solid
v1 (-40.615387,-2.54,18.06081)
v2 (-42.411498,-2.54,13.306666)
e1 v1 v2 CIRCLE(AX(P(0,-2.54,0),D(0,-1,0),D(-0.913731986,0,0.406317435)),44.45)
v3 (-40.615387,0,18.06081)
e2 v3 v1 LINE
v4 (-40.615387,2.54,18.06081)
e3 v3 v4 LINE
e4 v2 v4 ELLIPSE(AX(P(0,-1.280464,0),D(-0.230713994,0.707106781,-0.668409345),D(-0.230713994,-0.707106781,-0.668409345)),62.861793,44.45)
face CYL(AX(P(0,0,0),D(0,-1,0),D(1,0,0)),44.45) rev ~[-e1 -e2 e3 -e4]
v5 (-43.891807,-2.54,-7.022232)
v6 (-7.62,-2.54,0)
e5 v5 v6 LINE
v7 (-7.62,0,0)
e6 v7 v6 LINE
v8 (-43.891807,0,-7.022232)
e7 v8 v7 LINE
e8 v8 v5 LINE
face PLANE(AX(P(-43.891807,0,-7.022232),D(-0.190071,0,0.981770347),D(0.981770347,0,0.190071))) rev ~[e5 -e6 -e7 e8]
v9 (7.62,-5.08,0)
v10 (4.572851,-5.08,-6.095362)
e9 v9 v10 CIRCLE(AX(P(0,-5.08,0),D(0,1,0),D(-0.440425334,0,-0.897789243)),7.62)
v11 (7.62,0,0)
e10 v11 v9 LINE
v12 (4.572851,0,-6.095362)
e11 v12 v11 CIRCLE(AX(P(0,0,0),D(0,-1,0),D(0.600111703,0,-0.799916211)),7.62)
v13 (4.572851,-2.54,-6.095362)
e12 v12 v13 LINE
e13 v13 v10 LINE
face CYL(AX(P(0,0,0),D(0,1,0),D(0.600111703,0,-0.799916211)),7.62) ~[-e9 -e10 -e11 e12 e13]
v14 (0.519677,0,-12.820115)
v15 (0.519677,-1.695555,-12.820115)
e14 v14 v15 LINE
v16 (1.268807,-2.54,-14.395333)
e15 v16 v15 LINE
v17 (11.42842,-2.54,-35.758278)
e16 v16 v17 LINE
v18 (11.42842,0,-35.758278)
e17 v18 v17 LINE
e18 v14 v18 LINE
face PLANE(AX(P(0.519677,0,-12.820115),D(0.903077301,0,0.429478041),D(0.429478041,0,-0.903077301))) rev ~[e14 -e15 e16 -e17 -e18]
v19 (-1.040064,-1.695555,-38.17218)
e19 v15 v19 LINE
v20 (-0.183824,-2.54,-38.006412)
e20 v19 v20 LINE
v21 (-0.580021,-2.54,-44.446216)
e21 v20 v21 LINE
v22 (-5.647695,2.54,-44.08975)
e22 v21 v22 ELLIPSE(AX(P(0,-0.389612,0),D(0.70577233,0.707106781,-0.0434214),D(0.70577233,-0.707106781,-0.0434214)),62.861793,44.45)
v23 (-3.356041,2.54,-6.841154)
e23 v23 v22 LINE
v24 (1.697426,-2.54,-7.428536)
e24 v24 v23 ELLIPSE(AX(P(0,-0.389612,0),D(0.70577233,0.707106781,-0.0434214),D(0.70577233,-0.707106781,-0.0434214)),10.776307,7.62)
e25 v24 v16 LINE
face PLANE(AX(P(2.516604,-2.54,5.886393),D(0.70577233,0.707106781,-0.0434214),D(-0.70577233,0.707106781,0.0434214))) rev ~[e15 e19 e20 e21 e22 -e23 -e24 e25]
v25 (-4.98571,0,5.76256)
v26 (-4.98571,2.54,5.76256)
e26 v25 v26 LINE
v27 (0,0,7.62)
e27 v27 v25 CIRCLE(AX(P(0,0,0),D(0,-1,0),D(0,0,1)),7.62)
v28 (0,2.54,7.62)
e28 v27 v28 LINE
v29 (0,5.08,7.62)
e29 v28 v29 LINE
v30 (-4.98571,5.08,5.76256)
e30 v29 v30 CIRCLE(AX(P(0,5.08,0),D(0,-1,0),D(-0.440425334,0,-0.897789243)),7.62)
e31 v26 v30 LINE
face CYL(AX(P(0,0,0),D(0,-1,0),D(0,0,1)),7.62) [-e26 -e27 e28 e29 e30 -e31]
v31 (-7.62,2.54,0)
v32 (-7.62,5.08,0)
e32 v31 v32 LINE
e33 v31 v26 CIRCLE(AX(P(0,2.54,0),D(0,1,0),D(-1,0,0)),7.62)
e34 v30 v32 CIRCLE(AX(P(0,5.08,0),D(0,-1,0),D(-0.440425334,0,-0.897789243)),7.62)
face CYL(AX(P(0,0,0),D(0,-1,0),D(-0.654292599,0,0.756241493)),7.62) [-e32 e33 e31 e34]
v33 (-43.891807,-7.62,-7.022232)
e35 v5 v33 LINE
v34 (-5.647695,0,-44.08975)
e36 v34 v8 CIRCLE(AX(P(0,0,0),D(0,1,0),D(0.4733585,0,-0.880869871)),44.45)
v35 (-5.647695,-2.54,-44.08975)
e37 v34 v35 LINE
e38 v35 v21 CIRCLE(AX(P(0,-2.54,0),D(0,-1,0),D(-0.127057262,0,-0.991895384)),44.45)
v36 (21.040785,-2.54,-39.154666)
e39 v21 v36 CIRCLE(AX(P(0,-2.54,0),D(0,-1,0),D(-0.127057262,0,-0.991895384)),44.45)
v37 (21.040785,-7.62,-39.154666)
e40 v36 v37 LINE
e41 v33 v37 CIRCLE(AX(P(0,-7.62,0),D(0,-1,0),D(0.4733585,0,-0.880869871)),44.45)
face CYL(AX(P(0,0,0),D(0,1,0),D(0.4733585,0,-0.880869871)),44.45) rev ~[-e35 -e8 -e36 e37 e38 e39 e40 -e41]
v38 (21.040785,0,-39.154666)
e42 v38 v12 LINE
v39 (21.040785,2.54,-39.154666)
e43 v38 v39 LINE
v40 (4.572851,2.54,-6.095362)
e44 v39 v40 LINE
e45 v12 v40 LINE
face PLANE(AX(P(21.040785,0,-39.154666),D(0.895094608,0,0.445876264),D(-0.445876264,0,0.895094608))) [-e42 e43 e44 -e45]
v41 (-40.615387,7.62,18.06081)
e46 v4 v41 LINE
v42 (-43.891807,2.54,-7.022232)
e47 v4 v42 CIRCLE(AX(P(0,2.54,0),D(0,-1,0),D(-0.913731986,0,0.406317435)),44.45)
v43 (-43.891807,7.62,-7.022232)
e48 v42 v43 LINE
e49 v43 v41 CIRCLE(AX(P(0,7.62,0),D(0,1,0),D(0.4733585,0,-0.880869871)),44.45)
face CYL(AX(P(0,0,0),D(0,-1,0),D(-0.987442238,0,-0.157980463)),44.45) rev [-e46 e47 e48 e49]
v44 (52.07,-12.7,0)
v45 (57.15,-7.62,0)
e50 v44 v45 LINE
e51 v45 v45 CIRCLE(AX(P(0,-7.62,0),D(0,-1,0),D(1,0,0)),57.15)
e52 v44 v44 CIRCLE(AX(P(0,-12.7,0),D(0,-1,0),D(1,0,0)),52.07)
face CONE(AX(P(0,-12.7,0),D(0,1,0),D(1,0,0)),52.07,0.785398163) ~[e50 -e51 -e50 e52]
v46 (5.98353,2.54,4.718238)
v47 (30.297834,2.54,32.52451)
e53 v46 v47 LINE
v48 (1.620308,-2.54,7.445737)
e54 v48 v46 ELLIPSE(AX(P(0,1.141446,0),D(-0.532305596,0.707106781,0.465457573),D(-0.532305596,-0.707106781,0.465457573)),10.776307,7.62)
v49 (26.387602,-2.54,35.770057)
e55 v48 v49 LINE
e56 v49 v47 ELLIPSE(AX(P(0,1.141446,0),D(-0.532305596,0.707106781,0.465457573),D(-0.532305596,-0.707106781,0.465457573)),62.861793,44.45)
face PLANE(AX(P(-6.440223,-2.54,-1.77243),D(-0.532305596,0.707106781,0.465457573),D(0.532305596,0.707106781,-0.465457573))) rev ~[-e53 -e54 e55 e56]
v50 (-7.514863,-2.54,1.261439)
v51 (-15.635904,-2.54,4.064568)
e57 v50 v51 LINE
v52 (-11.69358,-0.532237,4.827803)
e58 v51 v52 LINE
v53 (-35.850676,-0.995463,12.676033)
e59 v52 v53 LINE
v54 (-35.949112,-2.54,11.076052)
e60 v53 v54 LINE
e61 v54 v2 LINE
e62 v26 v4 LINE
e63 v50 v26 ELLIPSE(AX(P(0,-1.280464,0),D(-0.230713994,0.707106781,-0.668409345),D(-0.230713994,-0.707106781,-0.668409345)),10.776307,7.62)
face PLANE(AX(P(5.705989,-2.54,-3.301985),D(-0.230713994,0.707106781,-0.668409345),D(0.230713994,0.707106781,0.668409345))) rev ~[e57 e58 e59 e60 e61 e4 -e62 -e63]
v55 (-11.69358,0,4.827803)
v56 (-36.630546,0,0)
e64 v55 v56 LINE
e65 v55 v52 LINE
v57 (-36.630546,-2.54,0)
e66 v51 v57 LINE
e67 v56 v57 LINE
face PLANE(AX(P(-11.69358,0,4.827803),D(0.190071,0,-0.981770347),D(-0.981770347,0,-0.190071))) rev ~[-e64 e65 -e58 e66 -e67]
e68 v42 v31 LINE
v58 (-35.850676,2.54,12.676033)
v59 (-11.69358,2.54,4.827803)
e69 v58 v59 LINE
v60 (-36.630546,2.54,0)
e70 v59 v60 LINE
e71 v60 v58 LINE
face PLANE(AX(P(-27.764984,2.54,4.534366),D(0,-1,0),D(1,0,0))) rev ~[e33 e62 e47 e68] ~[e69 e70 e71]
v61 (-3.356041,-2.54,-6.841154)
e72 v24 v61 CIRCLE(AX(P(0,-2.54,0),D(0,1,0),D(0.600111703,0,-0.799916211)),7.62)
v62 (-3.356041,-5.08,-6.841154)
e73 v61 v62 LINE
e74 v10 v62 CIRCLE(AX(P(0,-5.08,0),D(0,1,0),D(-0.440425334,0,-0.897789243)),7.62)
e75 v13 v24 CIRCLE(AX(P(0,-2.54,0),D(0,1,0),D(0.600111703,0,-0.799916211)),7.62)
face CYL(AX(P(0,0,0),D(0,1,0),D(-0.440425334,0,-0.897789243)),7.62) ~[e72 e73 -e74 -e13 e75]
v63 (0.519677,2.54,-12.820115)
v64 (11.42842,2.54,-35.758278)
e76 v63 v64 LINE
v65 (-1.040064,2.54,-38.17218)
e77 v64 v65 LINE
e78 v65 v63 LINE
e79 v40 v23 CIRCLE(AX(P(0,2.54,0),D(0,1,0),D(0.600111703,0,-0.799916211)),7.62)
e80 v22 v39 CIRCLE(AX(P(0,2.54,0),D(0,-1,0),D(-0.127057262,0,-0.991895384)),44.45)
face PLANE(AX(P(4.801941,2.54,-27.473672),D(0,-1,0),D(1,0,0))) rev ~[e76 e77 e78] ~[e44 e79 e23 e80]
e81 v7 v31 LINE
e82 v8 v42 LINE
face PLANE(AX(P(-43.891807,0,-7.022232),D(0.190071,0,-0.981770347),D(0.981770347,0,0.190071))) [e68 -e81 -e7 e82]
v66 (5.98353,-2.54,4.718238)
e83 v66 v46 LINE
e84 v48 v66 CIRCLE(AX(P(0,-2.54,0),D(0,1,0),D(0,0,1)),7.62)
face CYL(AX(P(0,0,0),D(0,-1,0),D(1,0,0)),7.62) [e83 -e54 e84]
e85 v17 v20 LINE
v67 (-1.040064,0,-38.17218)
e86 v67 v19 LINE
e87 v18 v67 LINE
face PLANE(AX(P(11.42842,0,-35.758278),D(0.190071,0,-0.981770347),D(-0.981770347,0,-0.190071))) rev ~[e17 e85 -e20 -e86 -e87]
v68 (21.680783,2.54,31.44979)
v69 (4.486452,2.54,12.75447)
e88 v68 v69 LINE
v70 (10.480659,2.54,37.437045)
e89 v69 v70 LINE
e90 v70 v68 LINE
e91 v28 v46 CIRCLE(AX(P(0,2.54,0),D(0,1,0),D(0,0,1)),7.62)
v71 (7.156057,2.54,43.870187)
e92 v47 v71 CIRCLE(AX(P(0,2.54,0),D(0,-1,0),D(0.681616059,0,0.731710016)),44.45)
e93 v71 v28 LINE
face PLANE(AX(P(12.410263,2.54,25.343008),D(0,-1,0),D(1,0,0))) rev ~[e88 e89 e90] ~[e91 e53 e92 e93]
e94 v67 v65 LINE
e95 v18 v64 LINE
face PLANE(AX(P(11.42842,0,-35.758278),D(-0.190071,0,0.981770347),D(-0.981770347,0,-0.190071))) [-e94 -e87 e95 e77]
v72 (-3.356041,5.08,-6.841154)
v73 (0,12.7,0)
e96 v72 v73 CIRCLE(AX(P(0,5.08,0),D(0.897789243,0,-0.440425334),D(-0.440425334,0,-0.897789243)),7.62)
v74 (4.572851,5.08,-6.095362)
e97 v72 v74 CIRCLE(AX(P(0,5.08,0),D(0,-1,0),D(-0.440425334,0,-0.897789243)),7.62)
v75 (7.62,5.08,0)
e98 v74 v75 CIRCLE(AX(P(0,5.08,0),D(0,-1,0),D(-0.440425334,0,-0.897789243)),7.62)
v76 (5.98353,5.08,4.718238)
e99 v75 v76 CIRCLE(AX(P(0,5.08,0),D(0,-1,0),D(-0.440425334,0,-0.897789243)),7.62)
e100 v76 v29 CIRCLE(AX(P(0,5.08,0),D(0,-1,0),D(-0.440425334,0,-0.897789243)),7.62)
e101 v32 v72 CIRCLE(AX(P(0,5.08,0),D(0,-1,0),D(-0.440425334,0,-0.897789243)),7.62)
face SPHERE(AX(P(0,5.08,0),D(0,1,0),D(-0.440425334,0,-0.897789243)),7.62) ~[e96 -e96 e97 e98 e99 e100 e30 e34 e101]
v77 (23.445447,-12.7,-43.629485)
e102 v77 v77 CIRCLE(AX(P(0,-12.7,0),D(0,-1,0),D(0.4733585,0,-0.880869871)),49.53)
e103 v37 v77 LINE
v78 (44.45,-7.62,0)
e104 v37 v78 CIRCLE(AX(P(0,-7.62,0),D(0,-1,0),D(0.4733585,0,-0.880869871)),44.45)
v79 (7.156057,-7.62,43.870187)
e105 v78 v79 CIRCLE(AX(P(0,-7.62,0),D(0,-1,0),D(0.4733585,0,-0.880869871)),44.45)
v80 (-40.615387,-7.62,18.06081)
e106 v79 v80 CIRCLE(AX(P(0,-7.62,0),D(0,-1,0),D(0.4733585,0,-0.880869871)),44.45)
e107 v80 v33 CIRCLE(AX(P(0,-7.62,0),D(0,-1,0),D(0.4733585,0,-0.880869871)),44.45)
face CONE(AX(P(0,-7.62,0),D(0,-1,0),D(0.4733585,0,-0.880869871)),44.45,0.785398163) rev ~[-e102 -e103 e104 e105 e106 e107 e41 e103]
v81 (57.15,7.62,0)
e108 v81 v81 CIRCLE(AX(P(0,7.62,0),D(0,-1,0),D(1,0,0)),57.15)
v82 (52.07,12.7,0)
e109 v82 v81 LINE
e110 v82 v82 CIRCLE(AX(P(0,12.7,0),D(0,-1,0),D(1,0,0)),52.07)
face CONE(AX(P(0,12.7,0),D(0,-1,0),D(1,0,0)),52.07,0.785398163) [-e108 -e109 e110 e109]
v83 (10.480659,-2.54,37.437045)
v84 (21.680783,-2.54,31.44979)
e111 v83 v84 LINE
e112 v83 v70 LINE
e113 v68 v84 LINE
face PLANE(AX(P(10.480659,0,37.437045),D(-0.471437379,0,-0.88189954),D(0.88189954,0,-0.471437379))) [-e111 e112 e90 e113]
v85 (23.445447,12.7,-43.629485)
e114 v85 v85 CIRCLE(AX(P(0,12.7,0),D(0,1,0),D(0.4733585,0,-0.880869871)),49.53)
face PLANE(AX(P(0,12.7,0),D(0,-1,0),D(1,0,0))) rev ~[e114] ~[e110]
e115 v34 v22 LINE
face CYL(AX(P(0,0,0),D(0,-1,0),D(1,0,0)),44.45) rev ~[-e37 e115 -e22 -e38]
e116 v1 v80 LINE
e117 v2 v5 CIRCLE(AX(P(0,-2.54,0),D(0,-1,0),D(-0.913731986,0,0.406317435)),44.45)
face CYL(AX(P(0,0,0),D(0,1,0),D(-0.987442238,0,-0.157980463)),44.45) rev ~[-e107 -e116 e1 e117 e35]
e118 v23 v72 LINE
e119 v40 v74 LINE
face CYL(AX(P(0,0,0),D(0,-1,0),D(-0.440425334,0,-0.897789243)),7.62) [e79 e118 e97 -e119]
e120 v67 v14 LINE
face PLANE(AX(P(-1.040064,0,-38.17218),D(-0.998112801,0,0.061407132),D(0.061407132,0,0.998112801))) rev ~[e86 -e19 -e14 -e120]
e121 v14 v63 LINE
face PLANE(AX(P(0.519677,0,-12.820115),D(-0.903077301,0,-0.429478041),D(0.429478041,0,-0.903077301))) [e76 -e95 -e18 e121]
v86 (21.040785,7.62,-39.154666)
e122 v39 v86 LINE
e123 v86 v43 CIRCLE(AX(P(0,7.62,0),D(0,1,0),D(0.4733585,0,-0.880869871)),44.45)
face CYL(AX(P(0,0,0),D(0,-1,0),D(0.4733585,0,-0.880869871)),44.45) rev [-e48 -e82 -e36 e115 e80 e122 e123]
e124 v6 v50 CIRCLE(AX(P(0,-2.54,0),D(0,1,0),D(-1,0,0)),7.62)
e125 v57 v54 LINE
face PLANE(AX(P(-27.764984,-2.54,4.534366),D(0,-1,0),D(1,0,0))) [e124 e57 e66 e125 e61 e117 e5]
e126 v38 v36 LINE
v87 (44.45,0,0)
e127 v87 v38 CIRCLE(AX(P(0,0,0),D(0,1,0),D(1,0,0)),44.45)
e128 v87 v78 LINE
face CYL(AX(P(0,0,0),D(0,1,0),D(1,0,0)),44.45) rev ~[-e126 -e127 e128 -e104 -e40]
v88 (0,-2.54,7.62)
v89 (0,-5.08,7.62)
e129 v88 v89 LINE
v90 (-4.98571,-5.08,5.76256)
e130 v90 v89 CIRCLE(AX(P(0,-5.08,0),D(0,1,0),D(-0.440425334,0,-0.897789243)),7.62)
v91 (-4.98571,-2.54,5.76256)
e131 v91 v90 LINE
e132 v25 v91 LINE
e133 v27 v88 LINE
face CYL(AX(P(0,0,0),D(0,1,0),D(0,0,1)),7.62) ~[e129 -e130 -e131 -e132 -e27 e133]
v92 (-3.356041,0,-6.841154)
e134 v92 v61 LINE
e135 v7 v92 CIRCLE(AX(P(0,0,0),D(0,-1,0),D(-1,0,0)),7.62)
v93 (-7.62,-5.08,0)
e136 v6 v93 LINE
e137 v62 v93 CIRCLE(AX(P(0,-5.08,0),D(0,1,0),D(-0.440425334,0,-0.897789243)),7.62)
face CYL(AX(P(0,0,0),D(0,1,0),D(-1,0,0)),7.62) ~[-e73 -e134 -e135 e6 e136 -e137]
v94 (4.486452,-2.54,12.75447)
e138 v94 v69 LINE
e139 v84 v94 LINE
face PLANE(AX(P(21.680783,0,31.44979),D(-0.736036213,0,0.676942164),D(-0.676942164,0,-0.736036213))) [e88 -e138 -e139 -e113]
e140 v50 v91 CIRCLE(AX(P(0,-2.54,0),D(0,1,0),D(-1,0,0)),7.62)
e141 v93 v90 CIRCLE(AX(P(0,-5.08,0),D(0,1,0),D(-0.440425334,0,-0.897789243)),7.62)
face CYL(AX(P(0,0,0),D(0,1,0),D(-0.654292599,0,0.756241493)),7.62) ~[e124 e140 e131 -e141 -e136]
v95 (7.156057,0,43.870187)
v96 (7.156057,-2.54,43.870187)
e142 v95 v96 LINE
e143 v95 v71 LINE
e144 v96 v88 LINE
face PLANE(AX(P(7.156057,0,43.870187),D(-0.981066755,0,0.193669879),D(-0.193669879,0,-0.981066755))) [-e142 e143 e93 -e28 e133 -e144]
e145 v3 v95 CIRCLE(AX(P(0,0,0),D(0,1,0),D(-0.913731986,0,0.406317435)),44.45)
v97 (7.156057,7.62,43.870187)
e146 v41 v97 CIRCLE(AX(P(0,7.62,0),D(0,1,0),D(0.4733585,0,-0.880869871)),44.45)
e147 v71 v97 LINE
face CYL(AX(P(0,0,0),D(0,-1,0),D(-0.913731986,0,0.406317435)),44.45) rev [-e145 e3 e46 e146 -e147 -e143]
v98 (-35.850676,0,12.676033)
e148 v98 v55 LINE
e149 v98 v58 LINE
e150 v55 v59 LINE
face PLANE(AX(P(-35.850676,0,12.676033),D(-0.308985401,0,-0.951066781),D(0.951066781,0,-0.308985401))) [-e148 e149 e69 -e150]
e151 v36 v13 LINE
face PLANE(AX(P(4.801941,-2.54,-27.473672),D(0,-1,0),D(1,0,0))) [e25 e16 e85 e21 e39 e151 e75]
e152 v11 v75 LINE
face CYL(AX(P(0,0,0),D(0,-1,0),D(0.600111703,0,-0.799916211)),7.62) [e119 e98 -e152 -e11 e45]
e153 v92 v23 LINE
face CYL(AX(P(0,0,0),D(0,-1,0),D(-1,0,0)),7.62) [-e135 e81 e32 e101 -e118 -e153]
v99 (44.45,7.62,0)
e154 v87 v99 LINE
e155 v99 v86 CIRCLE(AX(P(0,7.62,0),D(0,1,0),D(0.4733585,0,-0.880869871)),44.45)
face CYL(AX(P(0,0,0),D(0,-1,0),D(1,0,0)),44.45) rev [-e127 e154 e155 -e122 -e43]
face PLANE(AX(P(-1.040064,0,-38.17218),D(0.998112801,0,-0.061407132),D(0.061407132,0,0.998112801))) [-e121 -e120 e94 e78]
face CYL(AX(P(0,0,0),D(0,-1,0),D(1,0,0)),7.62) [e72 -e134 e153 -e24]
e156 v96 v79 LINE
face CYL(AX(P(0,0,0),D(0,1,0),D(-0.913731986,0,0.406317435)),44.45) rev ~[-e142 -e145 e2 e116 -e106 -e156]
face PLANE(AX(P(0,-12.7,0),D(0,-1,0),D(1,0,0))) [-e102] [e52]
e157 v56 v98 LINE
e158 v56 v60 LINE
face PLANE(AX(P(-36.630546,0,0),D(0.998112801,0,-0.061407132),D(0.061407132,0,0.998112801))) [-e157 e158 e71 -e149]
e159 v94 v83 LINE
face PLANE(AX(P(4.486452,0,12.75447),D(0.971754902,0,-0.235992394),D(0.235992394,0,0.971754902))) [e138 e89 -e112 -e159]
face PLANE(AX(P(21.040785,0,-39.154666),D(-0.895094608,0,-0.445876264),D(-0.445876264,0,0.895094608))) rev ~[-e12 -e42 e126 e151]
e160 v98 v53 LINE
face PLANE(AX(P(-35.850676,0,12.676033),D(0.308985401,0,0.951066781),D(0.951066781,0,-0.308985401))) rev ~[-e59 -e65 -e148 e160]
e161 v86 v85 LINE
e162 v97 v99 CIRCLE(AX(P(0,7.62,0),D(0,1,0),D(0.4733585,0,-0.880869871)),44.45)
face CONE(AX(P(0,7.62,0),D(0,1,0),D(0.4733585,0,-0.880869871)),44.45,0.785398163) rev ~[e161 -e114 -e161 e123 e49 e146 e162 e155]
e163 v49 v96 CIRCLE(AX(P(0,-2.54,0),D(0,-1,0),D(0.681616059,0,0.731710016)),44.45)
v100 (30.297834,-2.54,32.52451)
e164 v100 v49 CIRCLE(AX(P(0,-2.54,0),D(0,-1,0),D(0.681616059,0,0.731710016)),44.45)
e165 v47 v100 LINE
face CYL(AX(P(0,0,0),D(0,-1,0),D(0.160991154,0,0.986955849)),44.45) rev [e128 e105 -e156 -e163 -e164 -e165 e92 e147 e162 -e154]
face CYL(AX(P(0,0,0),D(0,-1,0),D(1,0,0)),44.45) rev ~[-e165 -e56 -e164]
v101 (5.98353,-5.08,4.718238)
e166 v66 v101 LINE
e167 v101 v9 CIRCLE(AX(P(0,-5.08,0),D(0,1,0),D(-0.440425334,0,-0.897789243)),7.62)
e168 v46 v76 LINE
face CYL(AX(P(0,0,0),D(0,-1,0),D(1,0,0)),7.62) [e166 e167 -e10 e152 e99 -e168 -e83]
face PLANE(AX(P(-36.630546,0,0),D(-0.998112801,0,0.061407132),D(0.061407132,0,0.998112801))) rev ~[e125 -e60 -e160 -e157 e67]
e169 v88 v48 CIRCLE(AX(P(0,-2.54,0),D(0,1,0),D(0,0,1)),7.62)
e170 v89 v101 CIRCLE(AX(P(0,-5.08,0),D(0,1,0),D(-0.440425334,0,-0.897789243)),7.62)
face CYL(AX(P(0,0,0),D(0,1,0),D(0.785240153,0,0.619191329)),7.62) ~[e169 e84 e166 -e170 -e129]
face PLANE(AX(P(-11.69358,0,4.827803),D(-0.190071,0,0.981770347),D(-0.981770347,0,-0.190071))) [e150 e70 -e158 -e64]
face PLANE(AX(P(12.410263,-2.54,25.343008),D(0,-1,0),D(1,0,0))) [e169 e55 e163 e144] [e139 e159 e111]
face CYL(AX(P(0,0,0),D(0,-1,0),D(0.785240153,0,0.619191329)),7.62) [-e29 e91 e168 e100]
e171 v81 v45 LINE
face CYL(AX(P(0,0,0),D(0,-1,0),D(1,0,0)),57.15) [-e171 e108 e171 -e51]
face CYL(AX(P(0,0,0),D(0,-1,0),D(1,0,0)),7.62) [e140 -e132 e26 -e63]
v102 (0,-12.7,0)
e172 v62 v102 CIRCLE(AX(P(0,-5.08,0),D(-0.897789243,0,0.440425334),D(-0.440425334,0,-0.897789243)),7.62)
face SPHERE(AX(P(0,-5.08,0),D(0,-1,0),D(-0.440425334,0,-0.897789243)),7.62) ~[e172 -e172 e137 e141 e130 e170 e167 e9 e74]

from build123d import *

# Parameters (mm, degrees)
F0_R          = 57.15
F1_DEPTH      = 12.7
F1_DEPTH_BACK = 12.7
F2_DEPTH      = 2.54
F2_DEPTH_BACK = 2.54
F4_T3_DEPTH   = 63.8207499086
F4_S4_R       = 7.62
F4_T5_DEPTH   = 35
F4_S6_R       = 44.45
F4_T7_DEPTH   = 35
F4_T10_DEPTH  = 63.0657347927
F4_S11_R      = 7.62
F4_T12_DEPTH  = 36
F4_S13_R      = 44.45
F4_T14_DEPTH  = 36
F4_T17_DEPTH  = 63.4473233417
F4_S18_R      = 7.62
F4_T19_DEPTH  = 34
F4_S20_R      = 44.45
F4_T21_DEPTH  = 34


# Not quite as in the source:
# - a fillet or chamfer that OpenCascade refuses, or shapes differently, is made with other operations: its cross-section is extruded or revolved along the edge and cut away or added


with BuildPart() as f1:
    # F0 (on Front) → F1 (new body, two sides)
    with BuildSketch(Plane.XZ) as f1_sk:
        Circle(F0_R)
        with BuildLine():
            ThreePointArc((30.2978338322, 32.5245102204), (40.7586875024, 17.7350470278), (44.45, 0))
            ThreePointArc((44.45, 0), (38.1514443262, -22.8094233996), (21.0407853398, -39.1546657793))
            ThreePointArc((21.0407853398, -39.1546657793), (8.0824234514, -43.7090028616), (-5.6476952972, -44.0897498046))
            ThreePointArc((-5.6476952972, -44.0897498046), (-30.9360762044, -31.9180464483), (-43.8918074796, -7.0222315665))
            ThreePointArc((-43.8918074796, -7.0222315665), (-44.0755738858, 5.7572811841), (-40.6153867658, 18.0608100003))
            ThreePointArc((-40.6153867658, 18.0608100003), (-21.1284803601, 39.1074138454), (7.15605679, 43.8701874992))
            ThreePointArc((7.15605679, 43.8701874992), (19.5673089339, 39.9114384743), (30.2978338322, 32.5245102204))
        make_face(mode=Mode.SUBTRACT)
    extrude(amount=F1_DEPTH)
    extrude(f1_sk.sketch, amount=-F1_DEPTH_BACK)



with BuildPart() as f1b:
    # F0 (on Front) → F1, piece 2 (new body, two sides)
    with BuildSketch(Plane.XZ) as f1_2_sk:
        with BuildLine():
            ThreePointArc((7.62, 0), (7.1992672661, 2.4969883522), (5.9835299656, 4.7182379285))
            ThreePointArc((5.9835299656, 4.7182379285), (3.3250133071, 6.8562880998), (0, 7.62))
            ThreePointArc((0, 7.62), (-2.66023415, 7.1405569998), (-4.9857096013, 5.7625601751))
            ThreePointArc((-4.9857096013, 5.7625601751), (-6.930205883, 3.168066669), (-7.62, 0))
            ThreePointArc((-7.62, 0), (-6.4667392377, -4.030593459), (-3.3560410415, -6.8411540348))
            ThreePointArc((-3.3560410415, -6.8411540348), (0.7135883563, -7.5865138013), (4.5728511754, -6.0953615256))
            ThreePointArc((4.5728511754, -6.0953615256), (6.815773102, -3.407291743), (7.62, 0))
        make_face()
    extrude(amount=F1_DEPTH)
    extrude(f1_2_sk.sketch, amount=-F1_DEPTH_BACK)


with BuildPart() as f1_1:
    add(f1.part)

    add(f1b.part)  # F2 merges F1b
    # F0 (on Front) → F2 (join, two sides)
    with BuildSketch(Plane.XZ) as f2_sk:
        with BuildLine():
            Line((5.9835299656, 4.7182379285), (30.2978338322, 32.5245102204))
            ThreePointArc((30.2978338322, 32.5245102204), (19.5673089339, 39.9114384743), (7.15605679, 43.8701874992))
            Line((7.15605679, 43.8701874992), (0, 7.62))
            ThreePointArc((0, 7.62), (3.3250133071, 6.8562880998), (5.9835299656, 4.7182379285))
        make_face()
        Polygon((21.6807832905, 31.4497899136), (4.4864523225, 12.7544701099), (10.4806591381, 37.4370446242), align=None, mode=Mode.SUBTRACT)
        with BuildLine():
            Line((-4.9857096013, 5.7625601751), (-40.6153867658, 18.0608100003))
            ThreePointArc((-40.6153867658, 18.0608100003), (-44.0755738858, 5.7572811841), (-43.8918074796, -7.0222315665))
            Line((-43.8918074796, -7.0222315665), (-7.62, 0))
            ThreePointArc((-7.62, 0), (-6.930205883, 3.168066669), (-4.9857096013, 5.7625601751))
        make_face()
        Polygon((-35.8506757944, 12.6760325764), (-11.6935795524, 4.8278034033), (-36.6305463748, 0), align=None, mode=Mode.SUBTRACT)
        with BuildLine():
            ThreePointArc((-5.6476952972, -44.0897498046), (8.0824234514, -43.7090028616), (21.0407853398, -39.1546657793))
            Line((21.0407853398, -39.1546657793), (4.5728511754, -6.0953615256))
            ThreePointArc((4.5728511754, -6.0953615256), (0.7135883563, -7.5865138013), (-3.3560410415, -6.8411540348))
            Line((-3.3560410415, -6.8411540348), (-5.6476952972, -44.0897498046))
        make_face()
        Polygon((-1.0400637192, -38.1721799109), (0.5196774415, -12.8201147581), (11.428419692, -35.7582782093), align=None, mode=Mode.SUBTRACT)
    extrude(amount=F2_DEPTH)
    extrude(f2_sk.sketch, amount=-F2_DEPTH_BACK)

    # F3: fillet of radius 7.62 on 2 edges, made by hand

    # F3_s1 → F3_t2 (revolve, cut)
    with BuildSketch(Plane(origin=(0, 0, 0), x_dir=(0, 1, 0), z_dir=(0.8977892434, 0, -0.4404253335))):
        with BuildLine():
            ThreePointArc((-5.08, -7.62), (-10.4681536726, -5.3881536726), (-12.7, 0))
            Line((-12.7, 0), (-12.7, -7.62))
            Line((-12.7, -7.62), (-5.08, -7.62))
        make_face()
    revolve(axis=Axis((0, -12.7, 0), (0, 1, 0)), mode=Mode.SUBTRACT)

    # F3_s3 → F3_t4 (revolve, cut)
    with BuildSketch(Plane(origin=(0, 0, 0), x_dir=(0, 1, 0), z_dir=(-0.8977892434, 0, 0.4404253335))):
        with BuildLine():
            ThreePointArc((5.08, 7.62), (10.4681536726, 5.3881536726), (12.7, 0))
            Line((12.7, 0), (12.7, 7.62))
            Line((12.7, 7.62), (5.08, 7.62))
        make_face()
    revolve(axis=Axis((0, 12.7, 0), (0, -1, 0)), mode=Mode.SUBTRACT)

    # F4: chamfer of 5.08 on 7 edges, made by hand


with BuildPart() as f4_tool1:
    # F4_s2 → F4_t3 (new body)
    with BuildSketch(Plane(origin=(6.116948919, 0, -2.1113793882), x_dir=(0, 1, 0), z_dir=(-0.9452735615, 0, 0.326278859))):
        Polygon((-2.54, 1.2595358599), (2.54, -3.8204641401), (-2.54, -3.8204641401), align=None)
    extrude(amount=F4_T3_DEPTH)

    # F4_s4 → F4_t5 (cut, symmetric)
    with BuildSketch(Plane.XZ):
        Circle(F4_S4_R)
    extrude(amount=F4_T5_DEPTH, both=True, mode=Mode.SUBTRACT)

    # F4_s6 → F4_t7 (intersect, symmetric)
    with BuildSketch(Plane.XZ):
        Circle(F4_S6_R)
    extrude(amount=F4_T7_DEPTH, both=True, mode=Mode.INTERSECT)


with BuildPart() as f4_tool8:
    # F4_s9 → F4_t10 (new body)
    with BuildSketch(Plane(origin=(-3.6688529254, 0, -4.1957657518), x_dir=(0, 1, 0), z_dir=(0.6582564125, 0, 0.7527937934))):
        Polygon((-2.54, 3.6814461509), (2.54, -1.3985538491), (-2.54, -1.3985538491), align=None)
    extrude(amount=F4_T10_DEPTH)

    # F4_s11 → F4_t12 (cut, symmetric)
    with BuildSketch(Plane.XZ):
        Circle(F4_S11_R)
    extrude(amount=F4_T12_DEPTH, both=True, mode=Mode.SUBTRACT)

    # F4_s13 → F4_t14 (intersect, symmetric)
    with BuildSketch(Plane.XZ):
        Circle(F4_S13_R)
    extrude(amount=F4_T14_DEPTH, both=True, mode=Mode.INTERSECT)


with BuildPart() as f4_tool15:
    # F4_s16 → F4_t17 (new body)
    with BuildSketch(Plane(origin=(0.3702740347, 0, 6.0184418339), x_dir=(0, 1, 0), z_dir=(-0.0614071323, 0, -0.9981128013))):
        Polygon((-2.54, 2.1503881258), (2.54, -2.9296118742), (-2.54, -2.9296118742), align=None)
    extrude(amount=F4_T17_DEPTH)

    # F4_s18 → F4_t19 (cut, symmetric)
    with BuildSketch(Plane.XZ):
        Circle(F4_S18_R)
    extrude(amount=F4_T19_DEPTH, both=True, mode=Mode.SUBTRACT)

    # F4_s20 → F4_t21 (intersect, symmetric)
    with BuildSketch(Plane.XZ):
        Circle(F4_S20_R)
    extrude(amount=F4_T21_DEPTH, both=True, mode=Mode.INTERSECT)


with BuildPart() as f4_tool22:
    # F4_s23 → F4_t24 (revolve)
    with BuildSketch(Plane(origin=(0, 0, 0), x_dir=(0, 1, 0), z_dir=(-0.8808698713, 0, -0.4733585003))):
        Polygon((-7.62, 44.45), (-12.7, 49.53), (-12.7, 44.45), align=None)
    revolve(axis=Axis((0, -12.7, 0), (0, -1, 0)))


with BuildPart() as f4_tool25:
    # F4_s26 → F4_t27 (revolve)
    with BuildSketch(Plane(origin=(0, 0, 0), x_dir=(0, 1, 0), z_dir=(0.8808698713, 0, 0.4733585003))):
        Polygon((7.62, -44.45), (12.7, -49.53), (12.7, -44.45), align=None)
    revolve(axis=Axis((0, 12.7, 0), (0, 1, 0)))


with BuildPart() as f4_tool28:
    # F4_s29 → F4_t30 (revolve)
    with BuildSketch(Plane.XY):
        Polygon((52.07, 12.7), (57.15, 7.62), (57.15, 12.7), align=None)
    revolve(axis=Axis((0, 12.7, 0), (0, -1, 0)))


with BuildPart() as f4_tool31:
    # F4_s32 → F4_t33 (revolve)
    with BuildSketch(Plane.XY):
        Polygon((52.07, -12.7), (57.15, -7.62), (57.15, -12.7), align=None)
    revolve(axis=Axis((0, -12.7, 0), (0, -1, 0)))


with BuildPart() as f1_2:
    add(f1_1.part)

    # F4_t34: cut F4_tool1, F4_tool8, F4_tool15, F4_tool22, F4_tool25, F4_tool28, F4_tool31
    add([f4_tool1.part, f4_tool8.part, f4_tool15.part, f4_tool22.part, f4_tool25.part, f4_tool28.part, f4_tool31.part], mode=Mode.SUBTRACT)


solid = f1_2.part
